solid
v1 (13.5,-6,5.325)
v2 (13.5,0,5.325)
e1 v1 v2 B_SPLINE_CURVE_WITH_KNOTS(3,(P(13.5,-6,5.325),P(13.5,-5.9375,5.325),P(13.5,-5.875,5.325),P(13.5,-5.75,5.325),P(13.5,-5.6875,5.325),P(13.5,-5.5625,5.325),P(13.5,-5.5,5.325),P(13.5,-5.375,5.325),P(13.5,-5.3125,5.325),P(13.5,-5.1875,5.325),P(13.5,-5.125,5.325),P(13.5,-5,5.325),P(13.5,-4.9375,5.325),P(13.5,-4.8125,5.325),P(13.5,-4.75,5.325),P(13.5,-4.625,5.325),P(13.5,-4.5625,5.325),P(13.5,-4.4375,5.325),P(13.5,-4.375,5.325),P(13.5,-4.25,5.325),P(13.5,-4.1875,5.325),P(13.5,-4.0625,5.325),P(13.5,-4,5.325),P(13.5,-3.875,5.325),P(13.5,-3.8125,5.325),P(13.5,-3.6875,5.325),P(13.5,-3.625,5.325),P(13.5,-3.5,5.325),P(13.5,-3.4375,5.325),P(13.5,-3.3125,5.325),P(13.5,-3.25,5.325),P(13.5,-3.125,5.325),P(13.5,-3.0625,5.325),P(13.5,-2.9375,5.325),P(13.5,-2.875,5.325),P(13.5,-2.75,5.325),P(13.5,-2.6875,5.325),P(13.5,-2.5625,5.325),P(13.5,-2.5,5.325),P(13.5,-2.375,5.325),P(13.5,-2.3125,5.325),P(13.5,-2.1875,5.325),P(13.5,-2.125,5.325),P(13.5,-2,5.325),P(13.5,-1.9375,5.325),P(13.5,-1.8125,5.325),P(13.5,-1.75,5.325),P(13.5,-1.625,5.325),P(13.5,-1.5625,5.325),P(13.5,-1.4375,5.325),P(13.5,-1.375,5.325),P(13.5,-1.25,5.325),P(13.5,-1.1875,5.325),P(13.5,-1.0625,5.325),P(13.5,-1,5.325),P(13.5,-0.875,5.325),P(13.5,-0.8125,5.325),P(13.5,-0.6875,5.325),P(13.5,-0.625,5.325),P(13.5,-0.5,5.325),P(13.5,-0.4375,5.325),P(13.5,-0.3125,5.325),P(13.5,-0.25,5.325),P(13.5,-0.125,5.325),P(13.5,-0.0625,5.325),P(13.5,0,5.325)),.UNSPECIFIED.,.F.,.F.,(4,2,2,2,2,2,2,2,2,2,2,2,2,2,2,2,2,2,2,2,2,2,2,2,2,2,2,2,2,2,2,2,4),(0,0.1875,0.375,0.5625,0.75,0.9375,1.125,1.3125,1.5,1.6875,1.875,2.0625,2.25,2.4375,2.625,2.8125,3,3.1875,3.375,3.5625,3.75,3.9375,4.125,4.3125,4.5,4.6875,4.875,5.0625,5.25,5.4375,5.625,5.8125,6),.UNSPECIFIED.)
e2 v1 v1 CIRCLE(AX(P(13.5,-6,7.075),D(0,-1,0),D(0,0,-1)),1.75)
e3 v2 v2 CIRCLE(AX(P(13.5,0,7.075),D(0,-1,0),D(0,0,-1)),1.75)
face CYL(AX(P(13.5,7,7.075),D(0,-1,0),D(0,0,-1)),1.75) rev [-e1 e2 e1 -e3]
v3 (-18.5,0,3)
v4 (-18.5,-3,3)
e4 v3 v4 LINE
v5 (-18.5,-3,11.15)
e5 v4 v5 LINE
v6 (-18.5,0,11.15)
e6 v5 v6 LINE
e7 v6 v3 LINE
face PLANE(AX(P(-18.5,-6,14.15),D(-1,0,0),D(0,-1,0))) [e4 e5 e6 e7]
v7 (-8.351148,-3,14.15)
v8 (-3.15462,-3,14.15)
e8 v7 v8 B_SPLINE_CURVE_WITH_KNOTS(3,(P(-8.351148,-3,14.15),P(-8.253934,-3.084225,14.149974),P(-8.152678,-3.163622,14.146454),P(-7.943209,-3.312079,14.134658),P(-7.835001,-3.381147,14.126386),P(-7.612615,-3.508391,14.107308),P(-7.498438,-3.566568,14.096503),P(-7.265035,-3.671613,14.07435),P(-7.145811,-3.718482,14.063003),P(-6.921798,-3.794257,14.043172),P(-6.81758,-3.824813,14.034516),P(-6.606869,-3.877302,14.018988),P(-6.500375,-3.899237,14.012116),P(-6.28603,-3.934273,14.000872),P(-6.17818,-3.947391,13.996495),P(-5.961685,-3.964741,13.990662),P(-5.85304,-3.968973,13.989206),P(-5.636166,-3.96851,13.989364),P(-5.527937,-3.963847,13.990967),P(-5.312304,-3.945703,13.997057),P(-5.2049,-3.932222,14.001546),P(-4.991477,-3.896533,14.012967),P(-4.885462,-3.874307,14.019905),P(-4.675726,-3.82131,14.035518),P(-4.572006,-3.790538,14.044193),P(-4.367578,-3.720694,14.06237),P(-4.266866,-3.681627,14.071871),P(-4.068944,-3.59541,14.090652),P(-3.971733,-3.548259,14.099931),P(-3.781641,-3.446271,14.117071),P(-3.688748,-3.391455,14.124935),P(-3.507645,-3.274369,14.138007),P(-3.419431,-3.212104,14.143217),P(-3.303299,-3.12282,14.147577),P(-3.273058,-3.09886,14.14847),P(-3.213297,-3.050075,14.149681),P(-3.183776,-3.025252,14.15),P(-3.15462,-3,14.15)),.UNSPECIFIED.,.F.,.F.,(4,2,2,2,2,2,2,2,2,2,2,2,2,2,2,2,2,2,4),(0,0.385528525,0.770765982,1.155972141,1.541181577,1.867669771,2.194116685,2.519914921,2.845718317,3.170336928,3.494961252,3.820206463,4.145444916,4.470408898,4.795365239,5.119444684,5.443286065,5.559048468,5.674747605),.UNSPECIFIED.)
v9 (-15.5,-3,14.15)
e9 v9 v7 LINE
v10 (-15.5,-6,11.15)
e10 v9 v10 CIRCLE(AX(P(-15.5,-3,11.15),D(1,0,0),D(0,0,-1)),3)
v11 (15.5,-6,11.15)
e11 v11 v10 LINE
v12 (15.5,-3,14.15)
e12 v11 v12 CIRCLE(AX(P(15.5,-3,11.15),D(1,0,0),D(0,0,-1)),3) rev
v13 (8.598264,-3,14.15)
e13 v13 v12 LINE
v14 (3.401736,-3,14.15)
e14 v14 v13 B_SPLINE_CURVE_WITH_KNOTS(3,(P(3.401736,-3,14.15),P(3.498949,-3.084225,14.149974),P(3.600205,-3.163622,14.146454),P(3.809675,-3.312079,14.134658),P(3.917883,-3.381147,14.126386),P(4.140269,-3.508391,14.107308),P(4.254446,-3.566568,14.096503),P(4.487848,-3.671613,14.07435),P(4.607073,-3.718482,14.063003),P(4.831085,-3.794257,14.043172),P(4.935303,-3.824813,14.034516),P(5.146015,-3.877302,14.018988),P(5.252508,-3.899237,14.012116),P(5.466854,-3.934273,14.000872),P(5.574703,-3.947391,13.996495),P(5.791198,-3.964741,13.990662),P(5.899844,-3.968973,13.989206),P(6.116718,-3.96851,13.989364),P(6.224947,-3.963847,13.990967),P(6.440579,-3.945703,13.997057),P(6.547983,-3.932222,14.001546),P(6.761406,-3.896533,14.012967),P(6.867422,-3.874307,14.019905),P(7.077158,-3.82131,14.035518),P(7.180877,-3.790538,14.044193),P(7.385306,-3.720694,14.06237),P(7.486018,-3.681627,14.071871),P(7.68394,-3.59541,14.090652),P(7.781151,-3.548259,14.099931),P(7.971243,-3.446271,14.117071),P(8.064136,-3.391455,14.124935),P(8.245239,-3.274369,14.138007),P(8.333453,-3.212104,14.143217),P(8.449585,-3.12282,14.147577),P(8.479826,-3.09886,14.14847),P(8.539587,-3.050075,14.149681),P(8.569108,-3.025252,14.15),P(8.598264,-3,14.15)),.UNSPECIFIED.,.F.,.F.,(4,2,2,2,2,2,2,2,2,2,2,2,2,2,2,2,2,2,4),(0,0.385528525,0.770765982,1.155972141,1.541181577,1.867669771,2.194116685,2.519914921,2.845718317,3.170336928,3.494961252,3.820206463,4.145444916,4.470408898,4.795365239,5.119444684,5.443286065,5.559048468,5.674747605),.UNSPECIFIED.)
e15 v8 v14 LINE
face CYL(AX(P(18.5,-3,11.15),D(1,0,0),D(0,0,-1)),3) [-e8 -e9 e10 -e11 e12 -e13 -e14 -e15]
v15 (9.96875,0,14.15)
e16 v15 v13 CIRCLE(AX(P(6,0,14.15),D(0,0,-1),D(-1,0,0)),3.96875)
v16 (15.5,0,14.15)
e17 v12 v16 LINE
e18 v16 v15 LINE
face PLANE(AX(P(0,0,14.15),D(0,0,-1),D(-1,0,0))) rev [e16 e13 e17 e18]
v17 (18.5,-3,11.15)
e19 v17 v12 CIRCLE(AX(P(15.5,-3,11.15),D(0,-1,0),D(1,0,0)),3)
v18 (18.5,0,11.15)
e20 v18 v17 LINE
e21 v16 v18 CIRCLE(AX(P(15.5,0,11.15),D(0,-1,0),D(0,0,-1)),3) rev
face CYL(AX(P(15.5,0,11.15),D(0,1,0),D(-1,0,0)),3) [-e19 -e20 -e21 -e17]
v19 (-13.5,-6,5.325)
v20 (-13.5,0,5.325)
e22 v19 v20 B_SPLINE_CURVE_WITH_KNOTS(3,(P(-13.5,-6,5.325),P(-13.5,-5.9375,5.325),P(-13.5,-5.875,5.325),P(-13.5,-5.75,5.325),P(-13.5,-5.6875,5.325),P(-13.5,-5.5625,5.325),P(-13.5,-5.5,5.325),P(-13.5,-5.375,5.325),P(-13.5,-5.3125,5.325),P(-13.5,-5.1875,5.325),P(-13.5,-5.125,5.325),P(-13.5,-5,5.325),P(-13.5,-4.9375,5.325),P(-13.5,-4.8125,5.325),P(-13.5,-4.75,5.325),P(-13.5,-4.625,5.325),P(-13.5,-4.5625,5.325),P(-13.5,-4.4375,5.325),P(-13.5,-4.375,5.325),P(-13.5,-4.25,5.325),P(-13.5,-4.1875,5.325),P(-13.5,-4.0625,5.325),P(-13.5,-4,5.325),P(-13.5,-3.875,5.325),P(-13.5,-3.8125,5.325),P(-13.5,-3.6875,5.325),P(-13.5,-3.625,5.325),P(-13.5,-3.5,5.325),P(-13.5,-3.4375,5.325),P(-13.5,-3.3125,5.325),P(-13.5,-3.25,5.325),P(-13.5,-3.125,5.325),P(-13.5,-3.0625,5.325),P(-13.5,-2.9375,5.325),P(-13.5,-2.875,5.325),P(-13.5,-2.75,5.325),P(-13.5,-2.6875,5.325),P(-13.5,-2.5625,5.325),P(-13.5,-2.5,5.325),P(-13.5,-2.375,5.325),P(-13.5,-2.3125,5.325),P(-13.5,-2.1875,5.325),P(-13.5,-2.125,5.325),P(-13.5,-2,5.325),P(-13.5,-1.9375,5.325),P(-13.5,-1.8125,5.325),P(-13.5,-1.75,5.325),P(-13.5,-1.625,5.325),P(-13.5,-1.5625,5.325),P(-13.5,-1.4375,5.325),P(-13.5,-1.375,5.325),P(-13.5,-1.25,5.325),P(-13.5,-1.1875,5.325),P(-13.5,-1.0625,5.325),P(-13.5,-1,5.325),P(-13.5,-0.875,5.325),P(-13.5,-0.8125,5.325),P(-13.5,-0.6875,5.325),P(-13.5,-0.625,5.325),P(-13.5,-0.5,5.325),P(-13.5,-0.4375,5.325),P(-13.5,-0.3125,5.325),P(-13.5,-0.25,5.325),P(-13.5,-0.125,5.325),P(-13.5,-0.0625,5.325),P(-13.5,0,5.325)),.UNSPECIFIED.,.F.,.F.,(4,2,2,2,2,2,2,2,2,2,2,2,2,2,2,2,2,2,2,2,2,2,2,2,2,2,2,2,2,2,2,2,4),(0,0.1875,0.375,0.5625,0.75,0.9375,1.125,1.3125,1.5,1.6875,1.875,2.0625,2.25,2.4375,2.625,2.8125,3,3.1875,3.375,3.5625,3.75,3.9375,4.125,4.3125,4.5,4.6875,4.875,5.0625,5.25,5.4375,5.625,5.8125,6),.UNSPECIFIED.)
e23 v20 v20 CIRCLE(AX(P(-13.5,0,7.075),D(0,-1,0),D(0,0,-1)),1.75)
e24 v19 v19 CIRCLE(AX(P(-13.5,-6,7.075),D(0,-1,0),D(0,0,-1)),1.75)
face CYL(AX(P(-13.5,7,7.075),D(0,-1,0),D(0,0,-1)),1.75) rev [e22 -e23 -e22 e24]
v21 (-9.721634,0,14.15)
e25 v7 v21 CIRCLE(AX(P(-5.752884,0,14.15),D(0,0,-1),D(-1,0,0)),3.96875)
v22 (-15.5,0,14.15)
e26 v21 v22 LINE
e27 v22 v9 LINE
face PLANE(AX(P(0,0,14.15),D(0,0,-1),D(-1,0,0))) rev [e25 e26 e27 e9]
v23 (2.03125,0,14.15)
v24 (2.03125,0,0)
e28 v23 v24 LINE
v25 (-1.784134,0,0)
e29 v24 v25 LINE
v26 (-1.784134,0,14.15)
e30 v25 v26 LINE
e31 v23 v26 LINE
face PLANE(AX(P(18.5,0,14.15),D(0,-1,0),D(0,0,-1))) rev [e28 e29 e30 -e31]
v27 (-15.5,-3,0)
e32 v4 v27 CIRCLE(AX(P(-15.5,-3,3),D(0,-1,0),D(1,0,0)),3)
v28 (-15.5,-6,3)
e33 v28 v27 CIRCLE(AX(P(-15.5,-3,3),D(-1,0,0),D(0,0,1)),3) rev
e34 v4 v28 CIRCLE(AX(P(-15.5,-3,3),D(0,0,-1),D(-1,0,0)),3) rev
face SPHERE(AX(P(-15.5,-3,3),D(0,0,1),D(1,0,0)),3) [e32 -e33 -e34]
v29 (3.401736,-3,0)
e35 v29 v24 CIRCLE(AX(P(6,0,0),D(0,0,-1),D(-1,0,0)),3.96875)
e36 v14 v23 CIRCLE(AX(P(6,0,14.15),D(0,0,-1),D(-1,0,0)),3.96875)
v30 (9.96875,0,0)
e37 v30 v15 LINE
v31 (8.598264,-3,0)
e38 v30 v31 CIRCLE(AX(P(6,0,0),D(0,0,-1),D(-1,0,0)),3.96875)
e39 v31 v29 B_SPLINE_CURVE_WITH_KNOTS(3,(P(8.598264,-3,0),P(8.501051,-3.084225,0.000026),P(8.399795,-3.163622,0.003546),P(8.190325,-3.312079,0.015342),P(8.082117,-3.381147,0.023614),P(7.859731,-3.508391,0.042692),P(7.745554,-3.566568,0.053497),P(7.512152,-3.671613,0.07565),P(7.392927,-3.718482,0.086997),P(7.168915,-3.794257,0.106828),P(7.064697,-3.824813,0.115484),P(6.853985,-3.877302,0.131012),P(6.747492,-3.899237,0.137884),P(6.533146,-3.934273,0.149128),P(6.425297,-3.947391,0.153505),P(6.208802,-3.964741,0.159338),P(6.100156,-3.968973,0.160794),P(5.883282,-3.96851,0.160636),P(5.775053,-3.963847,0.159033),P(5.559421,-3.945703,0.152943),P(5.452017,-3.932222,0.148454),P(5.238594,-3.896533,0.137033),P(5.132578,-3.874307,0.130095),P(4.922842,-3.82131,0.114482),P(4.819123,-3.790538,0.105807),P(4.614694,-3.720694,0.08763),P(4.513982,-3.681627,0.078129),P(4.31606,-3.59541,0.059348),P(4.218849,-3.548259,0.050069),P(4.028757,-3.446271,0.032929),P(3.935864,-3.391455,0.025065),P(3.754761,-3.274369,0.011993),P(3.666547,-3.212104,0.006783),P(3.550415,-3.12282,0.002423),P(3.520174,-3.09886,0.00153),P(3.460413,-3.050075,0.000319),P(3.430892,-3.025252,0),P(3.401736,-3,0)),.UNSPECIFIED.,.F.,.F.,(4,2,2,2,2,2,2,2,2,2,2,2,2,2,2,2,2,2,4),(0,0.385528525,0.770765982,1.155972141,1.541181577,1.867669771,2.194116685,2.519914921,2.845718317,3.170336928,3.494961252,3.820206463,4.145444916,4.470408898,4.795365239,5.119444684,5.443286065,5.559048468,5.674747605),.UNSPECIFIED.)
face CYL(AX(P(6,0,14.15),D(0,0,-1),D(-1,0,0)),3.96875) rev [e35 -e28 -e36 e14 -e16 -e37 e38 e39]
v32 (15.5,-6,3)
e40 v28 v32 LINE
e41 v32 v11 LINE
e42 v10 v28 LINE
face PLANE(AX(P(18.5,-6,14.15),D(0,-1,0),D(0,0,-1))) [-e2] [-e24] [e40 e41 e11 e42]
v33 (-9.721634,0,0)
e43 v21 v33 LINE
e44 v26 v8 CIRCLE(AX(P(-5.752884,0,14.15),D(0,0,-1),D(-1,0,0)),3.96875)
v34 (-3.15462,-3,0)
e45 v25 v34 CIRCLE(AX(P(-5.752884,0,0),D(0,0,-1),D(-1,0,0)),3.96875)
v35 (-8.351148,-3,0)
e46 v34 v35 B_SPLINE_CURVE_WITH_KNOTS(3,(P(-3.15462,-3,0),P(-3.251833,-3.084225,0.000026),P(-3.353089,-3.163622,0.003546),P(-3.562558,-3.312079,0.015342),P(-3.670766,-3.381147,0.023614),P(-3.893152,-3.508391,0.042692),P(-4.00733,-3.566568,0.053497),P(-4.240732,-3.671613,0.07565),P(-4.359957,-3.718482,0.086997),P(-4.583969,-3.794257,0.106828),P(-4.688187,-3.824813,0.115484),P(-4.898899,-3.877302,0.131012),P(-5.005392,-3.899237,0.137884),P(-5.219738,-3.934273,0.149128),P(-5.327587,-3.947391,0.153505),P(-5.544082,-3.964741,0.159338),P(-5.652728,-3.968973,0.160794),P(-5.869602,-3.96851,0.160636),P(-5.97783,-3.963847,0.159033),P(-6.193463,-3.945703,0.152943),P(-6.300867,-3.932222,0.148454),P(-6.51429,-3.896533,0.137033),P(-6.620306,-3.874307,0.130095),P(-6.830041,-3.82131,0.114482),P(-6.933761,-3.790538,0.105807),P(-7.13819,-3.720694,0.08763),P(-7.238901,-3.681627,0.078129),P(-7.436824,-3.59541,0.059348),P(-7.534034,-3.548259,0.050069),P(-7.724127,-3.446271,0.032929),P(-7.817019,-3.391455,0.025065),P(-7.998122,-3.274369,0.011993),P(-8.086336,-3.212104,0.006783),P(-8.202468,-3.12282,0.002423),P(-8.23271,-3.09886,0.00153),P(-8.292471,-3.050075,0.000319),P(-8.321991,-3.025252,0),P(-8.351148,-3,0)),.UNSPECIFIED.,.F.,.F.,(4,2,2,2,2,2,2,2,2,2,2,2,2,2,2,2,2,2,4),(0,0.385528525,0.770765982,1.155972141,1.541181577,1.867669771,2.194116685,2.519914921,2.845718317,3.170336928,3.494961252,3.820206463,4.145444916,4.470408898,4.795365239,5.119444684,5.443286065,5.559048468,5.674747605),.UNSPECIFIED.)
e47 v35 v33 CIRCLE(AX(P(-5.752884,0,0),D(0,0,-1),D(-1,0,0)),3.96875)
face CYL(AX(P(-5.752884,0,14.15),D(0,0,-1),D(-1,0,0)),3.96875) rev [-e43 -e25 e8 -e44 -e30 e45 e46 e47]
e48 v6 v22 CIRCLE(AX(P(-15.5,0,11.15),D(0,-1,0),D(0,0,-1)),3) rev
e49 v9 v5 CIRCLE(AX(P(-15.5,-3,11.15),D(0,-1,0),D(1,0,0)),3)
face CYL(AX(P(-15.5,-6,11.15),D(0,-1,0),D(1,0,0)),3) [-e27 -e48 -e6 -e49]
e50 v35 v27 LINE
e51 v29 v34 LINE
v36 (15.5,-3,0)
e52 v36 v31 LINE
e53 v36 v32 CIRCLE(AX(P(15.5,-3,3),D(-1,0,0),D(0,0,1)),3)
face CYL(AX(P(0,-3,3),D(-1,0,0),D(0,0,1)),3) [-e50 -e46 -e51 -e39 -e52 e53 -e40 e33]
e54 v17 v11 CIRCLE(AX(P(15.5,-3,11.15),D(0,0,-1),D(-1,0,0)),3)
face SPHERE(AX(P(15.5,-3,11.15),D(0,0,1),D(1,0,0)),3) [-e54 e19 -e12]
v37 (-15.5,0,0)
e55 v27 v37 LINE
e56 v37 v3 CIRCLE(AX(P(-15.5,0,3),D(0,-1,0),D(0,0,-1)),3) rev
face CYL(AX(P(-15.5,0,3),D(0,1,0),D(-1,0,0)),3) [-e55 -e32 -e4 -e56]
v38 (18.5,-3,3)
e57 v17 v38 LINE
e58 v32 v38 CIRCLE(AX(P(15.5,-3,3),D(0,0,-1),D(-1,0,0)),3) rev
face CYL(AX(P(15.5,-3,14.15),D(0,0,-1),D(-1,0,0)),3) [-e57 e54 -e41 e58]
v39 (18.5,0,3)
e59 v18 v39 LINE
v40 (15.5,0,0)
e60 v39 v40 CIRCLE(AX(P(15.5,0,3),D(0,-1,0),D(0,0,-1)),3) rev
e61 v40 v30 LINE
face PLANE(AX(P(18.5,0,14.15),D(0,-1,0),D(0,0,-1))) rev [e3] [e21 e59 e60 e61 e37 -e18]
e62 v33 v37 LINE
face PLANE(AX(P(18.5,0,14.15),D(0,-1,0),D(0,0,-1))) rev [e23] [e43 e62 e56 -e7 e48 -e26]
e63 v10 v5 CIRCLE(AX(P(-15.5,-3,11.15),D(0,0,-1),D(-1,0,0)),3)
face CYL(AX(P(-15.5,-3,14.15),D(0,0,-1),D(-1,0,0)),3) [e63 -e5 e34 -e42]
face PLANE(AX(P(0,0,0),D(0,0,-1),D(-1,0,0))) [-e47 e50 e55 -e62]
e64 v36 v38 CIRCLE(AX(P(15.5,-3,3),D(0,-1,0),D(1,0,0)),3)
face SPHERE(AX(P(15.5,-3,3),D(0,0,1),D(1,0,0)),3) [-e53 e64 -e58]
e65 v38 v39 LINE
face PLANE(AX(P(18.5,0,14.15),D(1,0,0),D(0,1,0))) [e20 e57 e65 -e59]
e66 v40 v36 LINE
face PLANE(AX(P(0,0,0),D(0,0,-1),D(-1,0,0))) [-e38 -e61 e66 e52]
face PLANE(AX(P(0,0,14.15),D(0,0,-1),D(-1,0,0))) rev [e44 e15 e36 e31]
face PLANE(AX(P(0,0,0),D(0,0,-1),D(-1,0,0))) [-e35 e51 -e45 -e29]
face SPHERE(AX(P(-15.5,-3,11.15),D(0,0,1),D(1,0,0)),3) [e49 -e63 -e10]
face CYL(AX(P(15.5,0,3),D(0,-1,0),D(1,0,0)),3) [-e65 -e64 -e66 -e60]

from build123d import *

# Parameters (mm, degrees)
ESBO_O1_W                = 37
ESBO_O1_H                = 6
RESSALTO_EXTRUS_O1_DEPTH = 14.15
ESBO_O2_R                = 3.96875
CORTE_EXTRUS_O1_DEPTH    = 25.051455257
ESBO_O3_R                = 1.75
CORTE_EXTRUS_O2_DEPTH    = 13
FILETE2_R                = 3
FILETE3_R                = 3


with BuildPart() as part:
    # Esboço1 → Ressalto-extrusão1 (new body)
    with BuildSketch(Plane.XY):
        with Locations((0, -3)):
            Rectangle(ESBO_O1_W, ESBO_O1_H)
    extrude(amount=RESSALTO_EXTRUS_O1_DEPTH)

    # Esboço2 → Corte-extrusão1 (cut, through all)
    with BuildSketch(Plane(origin=(0, 0, 0), x_dir=(-1, 0, 0), z_dir=(0, 0, -1))):
        with Locations((-6, 0)):
            Circle(ESBO_O2_R)
        with Locations((5.752883735, 0)):
            Circle(ESBO_O2_R)
    extrude(amount=-CORTE_EXTRUS_O1_DEPTH, mode=Mode.SUBTRACT)

    # Esboço3 → Corte-extrusão2 (cut)
    with BuildSketch(Plane.XZ.offset(6)):
        with Locations(Location((-13.5, 7.075, 0), (0, 0, 270))):
            Circle(ESBO_O3_R)
        with Locations(Location((13.5, 7.075, 0), (0, 0, 270))):
            Circle(ESBO_O3_R)
    extrude(amount=-CORTE_EXTRUS_O2_DEPTH, mode=Mode.SUBTRACT)

    # Filete2
    # the kernel refuses this fillet: 3 mm, written as the material it takes off along each edge
    with BuildSketch(Plane(origin=(-26, -6, 0), x_dir=(0, 1, 0), z_dir=(1, 0, 0))) as filete2_piece_1:
        with BuildLine():
            CenterArc((FILETE2_R, FILETE2_R), FILETE2_R, 180, 90)
            Line((0, FILETE2_R), (0, 0))
            Line((0, 0), (FILETE2_R, 0))
        make_face()
    extrude(amount=52, mode=Mode.SUBTRACT)
    with BuildSketch(Plane(origin=(-26, -6, 14.15), x_dir=(0, 1, 0), z_dir=(1, 0, 0))) as filete2_piece_2:
        with BuildLine():
            CenterArc((FILETE2_R, -FILETE2_R), FILETE2_R, 90, 90)
            Line((0, -FILETE2_R), (0, 0))
            Line((0, 0), (FILETE2_R, 0))
        make_face()
    extrude(amount=52, mode=Mode.SUBTRACT)
    with BuildSketch(Plane(origin=(-18.5, -6, -7.5), x_dir=(1, 0, 0), z_dir=(0, 0, 1)), Plane(origin=(18.5, -6, -7.5), x_dir=(0, 1, 0), z_dir=(0, 0, 1))) as filete2_piece_3:
        with BuildLine():
            CenterArc((FILETE2_R, FILETE2_R), FILETE2_R, 180, 90)
            Line((0, FILETE2_R), (0, 0))
            Line((0, 0), (FILETE2_R, 0))
        make_face()
    extrude(amount=29.15, mode=Mode.SUBTRACT)

    # Filete3
    # the kernel refuses this fillet: 3 mm, written as the material it takes off along each edge
    with BuildSketch(Plane(origin=(15.5, -3, 11.15), x_dir=(0, 0, 1), z_dir=(1, 0, 0))) as filete3_piece_1_section:
        Polygon((0, 0), (FILETE3_R, 0), (FILETE3_R, FILETE3_R), (0, FILETE3_R), align=None)
    filete3_piece_1 = extrude(amount=FILETE3_R, mode=Mode.PRIVATE)
    filete3_piece_1 = filete3_piece_1 - Plane(origin=(15.5, -3, 11.15), x_dir=(0, 0.7071067811865475, -0.7071067811865475), z_dir=(1, 0, 0)) * Sphere(FILETE3_R, mode=Mode.PRIVATE)
    add(filete3_piece_1, mode=Mode.SUBTRACT)
    with BuildSketch(Plane(origin=(15.5, -3, 3), x_dir=(1, 0, 0), z_dir=(0, 0, -1))) as filete3_piece_2_section:
        Polygon((0, 0), (FILETE3_R, 0), (FILETE3_R, FILETE3_R), (0, FILETE3_R), align=None)
    filete3_piece_2 = extrude(amount=FILETE3_R, mode=Mode.PRIVATE)
    filete3_piece_2 = filete3_piece_2 - Plane(origin=(15.5, -3, 3), x_dir=(-0.7071067811865472, 0.7071067811865477, 0), z_dir=(0, 0, -1)) * Sphere(FILETE3_R, mode=Mode.PRIVATE)
    add(filete3_piece_2, mode=Mode.SUBTRACT)
    with BuildSketch(Plane(origin=(-15.5, -3, 11.15), x_dir=(-1, 0, 0), z_dir=(0, 0, 1))) as filete3_piece_3_section:
        Polygon((0, 0), (FILETE3_R, 0), (FILETE3_R, FILETE3_R), (0, FILETE3_R), align=None)
    filete3_piece_3 = extrude(amount=FILETE3_R, mode=Mode.PRIVATE)
    filete3_piece_3 = filete3_piece_3 - Plane(origin=(-15.5, -3, 11.15), x_dir=(0.7071067811865472, 0.7071067811865477, 0), z_dir=(0, 0, 1)) * Sphere(FILETE3_R, mode=Mode.PRIVATE)
    add(filete3_piece_3, mode=Mode.SUBTRACT)
    with BuildSketch(Plane(origin=(-15.5, -3, 3), x_dir=(-1, 0, 0), z_dir=(0, 0, -1))) as filete3_piece_4_section:
        Polygon((0, 0), (FILETE3_R, 0), (FILETE3_R, -FILETE3_R), (0, -FILETE3_R), align=None)
    filete3_piece_4 = extrude(amount=FILETE3_R, mode=Mode.PRIVATE)
    filete3_piece_4 = filete3_piece_4 - Plane(origin=(-15.5, -3, 3), x_dir=(0.7071067811865472, 0.7071067811865477, 0), z_dir=(0, 0, -1)) * Sphere(FILETE3_R, mode=Mode.PRIVATE)
    add(filete3_piece_4, mode=Mode.SUBTRACT)
    with BuildSketch(Plane(origin=(18.5, -3, 14.15), x_dir=(0, 0, -1), z_dir=(0, 1, 0)), Plane(origin=(-18.5, 7.5, 0), x_dir=(1, 0, 0), z_dir=(0, -1, 0)), Plane(origin=(18.5, -3, 0), x_dir=(-1, 0, 0), z_dir=(0, 1, 0))) as filete3_piece_5:
        with BuildLine():
            CenterArc((FILETE3_R, FILETE3_R), FILETE3_R, 180, 90)
            Line((0, FILETE3_R), (0, 0))
            Line((0, 0), (FILETE3_R, 0))
        make_face()
    extrude(amount=10.5, mode=Mode.SUBTRACT)
    with BuildSketch(Plane(origin=(-18.5, 7.5, 14.15), x_dir=(1, 0, 0), z_dir=(0, -1, 0))) as filete3_piece_6:
        with BuildLine():
            CenterArc((FILETE3_R, -FILETE3_R), FILETE3_R, 90, 90)
            Line((0, -FILETE3_R), (0, 0))
            Line((0, 0), (FILETE3_R, 0))
        make_face()
    extrude(amount=10.5, mode=Mode.SUBTRACT)


solid = part.part
